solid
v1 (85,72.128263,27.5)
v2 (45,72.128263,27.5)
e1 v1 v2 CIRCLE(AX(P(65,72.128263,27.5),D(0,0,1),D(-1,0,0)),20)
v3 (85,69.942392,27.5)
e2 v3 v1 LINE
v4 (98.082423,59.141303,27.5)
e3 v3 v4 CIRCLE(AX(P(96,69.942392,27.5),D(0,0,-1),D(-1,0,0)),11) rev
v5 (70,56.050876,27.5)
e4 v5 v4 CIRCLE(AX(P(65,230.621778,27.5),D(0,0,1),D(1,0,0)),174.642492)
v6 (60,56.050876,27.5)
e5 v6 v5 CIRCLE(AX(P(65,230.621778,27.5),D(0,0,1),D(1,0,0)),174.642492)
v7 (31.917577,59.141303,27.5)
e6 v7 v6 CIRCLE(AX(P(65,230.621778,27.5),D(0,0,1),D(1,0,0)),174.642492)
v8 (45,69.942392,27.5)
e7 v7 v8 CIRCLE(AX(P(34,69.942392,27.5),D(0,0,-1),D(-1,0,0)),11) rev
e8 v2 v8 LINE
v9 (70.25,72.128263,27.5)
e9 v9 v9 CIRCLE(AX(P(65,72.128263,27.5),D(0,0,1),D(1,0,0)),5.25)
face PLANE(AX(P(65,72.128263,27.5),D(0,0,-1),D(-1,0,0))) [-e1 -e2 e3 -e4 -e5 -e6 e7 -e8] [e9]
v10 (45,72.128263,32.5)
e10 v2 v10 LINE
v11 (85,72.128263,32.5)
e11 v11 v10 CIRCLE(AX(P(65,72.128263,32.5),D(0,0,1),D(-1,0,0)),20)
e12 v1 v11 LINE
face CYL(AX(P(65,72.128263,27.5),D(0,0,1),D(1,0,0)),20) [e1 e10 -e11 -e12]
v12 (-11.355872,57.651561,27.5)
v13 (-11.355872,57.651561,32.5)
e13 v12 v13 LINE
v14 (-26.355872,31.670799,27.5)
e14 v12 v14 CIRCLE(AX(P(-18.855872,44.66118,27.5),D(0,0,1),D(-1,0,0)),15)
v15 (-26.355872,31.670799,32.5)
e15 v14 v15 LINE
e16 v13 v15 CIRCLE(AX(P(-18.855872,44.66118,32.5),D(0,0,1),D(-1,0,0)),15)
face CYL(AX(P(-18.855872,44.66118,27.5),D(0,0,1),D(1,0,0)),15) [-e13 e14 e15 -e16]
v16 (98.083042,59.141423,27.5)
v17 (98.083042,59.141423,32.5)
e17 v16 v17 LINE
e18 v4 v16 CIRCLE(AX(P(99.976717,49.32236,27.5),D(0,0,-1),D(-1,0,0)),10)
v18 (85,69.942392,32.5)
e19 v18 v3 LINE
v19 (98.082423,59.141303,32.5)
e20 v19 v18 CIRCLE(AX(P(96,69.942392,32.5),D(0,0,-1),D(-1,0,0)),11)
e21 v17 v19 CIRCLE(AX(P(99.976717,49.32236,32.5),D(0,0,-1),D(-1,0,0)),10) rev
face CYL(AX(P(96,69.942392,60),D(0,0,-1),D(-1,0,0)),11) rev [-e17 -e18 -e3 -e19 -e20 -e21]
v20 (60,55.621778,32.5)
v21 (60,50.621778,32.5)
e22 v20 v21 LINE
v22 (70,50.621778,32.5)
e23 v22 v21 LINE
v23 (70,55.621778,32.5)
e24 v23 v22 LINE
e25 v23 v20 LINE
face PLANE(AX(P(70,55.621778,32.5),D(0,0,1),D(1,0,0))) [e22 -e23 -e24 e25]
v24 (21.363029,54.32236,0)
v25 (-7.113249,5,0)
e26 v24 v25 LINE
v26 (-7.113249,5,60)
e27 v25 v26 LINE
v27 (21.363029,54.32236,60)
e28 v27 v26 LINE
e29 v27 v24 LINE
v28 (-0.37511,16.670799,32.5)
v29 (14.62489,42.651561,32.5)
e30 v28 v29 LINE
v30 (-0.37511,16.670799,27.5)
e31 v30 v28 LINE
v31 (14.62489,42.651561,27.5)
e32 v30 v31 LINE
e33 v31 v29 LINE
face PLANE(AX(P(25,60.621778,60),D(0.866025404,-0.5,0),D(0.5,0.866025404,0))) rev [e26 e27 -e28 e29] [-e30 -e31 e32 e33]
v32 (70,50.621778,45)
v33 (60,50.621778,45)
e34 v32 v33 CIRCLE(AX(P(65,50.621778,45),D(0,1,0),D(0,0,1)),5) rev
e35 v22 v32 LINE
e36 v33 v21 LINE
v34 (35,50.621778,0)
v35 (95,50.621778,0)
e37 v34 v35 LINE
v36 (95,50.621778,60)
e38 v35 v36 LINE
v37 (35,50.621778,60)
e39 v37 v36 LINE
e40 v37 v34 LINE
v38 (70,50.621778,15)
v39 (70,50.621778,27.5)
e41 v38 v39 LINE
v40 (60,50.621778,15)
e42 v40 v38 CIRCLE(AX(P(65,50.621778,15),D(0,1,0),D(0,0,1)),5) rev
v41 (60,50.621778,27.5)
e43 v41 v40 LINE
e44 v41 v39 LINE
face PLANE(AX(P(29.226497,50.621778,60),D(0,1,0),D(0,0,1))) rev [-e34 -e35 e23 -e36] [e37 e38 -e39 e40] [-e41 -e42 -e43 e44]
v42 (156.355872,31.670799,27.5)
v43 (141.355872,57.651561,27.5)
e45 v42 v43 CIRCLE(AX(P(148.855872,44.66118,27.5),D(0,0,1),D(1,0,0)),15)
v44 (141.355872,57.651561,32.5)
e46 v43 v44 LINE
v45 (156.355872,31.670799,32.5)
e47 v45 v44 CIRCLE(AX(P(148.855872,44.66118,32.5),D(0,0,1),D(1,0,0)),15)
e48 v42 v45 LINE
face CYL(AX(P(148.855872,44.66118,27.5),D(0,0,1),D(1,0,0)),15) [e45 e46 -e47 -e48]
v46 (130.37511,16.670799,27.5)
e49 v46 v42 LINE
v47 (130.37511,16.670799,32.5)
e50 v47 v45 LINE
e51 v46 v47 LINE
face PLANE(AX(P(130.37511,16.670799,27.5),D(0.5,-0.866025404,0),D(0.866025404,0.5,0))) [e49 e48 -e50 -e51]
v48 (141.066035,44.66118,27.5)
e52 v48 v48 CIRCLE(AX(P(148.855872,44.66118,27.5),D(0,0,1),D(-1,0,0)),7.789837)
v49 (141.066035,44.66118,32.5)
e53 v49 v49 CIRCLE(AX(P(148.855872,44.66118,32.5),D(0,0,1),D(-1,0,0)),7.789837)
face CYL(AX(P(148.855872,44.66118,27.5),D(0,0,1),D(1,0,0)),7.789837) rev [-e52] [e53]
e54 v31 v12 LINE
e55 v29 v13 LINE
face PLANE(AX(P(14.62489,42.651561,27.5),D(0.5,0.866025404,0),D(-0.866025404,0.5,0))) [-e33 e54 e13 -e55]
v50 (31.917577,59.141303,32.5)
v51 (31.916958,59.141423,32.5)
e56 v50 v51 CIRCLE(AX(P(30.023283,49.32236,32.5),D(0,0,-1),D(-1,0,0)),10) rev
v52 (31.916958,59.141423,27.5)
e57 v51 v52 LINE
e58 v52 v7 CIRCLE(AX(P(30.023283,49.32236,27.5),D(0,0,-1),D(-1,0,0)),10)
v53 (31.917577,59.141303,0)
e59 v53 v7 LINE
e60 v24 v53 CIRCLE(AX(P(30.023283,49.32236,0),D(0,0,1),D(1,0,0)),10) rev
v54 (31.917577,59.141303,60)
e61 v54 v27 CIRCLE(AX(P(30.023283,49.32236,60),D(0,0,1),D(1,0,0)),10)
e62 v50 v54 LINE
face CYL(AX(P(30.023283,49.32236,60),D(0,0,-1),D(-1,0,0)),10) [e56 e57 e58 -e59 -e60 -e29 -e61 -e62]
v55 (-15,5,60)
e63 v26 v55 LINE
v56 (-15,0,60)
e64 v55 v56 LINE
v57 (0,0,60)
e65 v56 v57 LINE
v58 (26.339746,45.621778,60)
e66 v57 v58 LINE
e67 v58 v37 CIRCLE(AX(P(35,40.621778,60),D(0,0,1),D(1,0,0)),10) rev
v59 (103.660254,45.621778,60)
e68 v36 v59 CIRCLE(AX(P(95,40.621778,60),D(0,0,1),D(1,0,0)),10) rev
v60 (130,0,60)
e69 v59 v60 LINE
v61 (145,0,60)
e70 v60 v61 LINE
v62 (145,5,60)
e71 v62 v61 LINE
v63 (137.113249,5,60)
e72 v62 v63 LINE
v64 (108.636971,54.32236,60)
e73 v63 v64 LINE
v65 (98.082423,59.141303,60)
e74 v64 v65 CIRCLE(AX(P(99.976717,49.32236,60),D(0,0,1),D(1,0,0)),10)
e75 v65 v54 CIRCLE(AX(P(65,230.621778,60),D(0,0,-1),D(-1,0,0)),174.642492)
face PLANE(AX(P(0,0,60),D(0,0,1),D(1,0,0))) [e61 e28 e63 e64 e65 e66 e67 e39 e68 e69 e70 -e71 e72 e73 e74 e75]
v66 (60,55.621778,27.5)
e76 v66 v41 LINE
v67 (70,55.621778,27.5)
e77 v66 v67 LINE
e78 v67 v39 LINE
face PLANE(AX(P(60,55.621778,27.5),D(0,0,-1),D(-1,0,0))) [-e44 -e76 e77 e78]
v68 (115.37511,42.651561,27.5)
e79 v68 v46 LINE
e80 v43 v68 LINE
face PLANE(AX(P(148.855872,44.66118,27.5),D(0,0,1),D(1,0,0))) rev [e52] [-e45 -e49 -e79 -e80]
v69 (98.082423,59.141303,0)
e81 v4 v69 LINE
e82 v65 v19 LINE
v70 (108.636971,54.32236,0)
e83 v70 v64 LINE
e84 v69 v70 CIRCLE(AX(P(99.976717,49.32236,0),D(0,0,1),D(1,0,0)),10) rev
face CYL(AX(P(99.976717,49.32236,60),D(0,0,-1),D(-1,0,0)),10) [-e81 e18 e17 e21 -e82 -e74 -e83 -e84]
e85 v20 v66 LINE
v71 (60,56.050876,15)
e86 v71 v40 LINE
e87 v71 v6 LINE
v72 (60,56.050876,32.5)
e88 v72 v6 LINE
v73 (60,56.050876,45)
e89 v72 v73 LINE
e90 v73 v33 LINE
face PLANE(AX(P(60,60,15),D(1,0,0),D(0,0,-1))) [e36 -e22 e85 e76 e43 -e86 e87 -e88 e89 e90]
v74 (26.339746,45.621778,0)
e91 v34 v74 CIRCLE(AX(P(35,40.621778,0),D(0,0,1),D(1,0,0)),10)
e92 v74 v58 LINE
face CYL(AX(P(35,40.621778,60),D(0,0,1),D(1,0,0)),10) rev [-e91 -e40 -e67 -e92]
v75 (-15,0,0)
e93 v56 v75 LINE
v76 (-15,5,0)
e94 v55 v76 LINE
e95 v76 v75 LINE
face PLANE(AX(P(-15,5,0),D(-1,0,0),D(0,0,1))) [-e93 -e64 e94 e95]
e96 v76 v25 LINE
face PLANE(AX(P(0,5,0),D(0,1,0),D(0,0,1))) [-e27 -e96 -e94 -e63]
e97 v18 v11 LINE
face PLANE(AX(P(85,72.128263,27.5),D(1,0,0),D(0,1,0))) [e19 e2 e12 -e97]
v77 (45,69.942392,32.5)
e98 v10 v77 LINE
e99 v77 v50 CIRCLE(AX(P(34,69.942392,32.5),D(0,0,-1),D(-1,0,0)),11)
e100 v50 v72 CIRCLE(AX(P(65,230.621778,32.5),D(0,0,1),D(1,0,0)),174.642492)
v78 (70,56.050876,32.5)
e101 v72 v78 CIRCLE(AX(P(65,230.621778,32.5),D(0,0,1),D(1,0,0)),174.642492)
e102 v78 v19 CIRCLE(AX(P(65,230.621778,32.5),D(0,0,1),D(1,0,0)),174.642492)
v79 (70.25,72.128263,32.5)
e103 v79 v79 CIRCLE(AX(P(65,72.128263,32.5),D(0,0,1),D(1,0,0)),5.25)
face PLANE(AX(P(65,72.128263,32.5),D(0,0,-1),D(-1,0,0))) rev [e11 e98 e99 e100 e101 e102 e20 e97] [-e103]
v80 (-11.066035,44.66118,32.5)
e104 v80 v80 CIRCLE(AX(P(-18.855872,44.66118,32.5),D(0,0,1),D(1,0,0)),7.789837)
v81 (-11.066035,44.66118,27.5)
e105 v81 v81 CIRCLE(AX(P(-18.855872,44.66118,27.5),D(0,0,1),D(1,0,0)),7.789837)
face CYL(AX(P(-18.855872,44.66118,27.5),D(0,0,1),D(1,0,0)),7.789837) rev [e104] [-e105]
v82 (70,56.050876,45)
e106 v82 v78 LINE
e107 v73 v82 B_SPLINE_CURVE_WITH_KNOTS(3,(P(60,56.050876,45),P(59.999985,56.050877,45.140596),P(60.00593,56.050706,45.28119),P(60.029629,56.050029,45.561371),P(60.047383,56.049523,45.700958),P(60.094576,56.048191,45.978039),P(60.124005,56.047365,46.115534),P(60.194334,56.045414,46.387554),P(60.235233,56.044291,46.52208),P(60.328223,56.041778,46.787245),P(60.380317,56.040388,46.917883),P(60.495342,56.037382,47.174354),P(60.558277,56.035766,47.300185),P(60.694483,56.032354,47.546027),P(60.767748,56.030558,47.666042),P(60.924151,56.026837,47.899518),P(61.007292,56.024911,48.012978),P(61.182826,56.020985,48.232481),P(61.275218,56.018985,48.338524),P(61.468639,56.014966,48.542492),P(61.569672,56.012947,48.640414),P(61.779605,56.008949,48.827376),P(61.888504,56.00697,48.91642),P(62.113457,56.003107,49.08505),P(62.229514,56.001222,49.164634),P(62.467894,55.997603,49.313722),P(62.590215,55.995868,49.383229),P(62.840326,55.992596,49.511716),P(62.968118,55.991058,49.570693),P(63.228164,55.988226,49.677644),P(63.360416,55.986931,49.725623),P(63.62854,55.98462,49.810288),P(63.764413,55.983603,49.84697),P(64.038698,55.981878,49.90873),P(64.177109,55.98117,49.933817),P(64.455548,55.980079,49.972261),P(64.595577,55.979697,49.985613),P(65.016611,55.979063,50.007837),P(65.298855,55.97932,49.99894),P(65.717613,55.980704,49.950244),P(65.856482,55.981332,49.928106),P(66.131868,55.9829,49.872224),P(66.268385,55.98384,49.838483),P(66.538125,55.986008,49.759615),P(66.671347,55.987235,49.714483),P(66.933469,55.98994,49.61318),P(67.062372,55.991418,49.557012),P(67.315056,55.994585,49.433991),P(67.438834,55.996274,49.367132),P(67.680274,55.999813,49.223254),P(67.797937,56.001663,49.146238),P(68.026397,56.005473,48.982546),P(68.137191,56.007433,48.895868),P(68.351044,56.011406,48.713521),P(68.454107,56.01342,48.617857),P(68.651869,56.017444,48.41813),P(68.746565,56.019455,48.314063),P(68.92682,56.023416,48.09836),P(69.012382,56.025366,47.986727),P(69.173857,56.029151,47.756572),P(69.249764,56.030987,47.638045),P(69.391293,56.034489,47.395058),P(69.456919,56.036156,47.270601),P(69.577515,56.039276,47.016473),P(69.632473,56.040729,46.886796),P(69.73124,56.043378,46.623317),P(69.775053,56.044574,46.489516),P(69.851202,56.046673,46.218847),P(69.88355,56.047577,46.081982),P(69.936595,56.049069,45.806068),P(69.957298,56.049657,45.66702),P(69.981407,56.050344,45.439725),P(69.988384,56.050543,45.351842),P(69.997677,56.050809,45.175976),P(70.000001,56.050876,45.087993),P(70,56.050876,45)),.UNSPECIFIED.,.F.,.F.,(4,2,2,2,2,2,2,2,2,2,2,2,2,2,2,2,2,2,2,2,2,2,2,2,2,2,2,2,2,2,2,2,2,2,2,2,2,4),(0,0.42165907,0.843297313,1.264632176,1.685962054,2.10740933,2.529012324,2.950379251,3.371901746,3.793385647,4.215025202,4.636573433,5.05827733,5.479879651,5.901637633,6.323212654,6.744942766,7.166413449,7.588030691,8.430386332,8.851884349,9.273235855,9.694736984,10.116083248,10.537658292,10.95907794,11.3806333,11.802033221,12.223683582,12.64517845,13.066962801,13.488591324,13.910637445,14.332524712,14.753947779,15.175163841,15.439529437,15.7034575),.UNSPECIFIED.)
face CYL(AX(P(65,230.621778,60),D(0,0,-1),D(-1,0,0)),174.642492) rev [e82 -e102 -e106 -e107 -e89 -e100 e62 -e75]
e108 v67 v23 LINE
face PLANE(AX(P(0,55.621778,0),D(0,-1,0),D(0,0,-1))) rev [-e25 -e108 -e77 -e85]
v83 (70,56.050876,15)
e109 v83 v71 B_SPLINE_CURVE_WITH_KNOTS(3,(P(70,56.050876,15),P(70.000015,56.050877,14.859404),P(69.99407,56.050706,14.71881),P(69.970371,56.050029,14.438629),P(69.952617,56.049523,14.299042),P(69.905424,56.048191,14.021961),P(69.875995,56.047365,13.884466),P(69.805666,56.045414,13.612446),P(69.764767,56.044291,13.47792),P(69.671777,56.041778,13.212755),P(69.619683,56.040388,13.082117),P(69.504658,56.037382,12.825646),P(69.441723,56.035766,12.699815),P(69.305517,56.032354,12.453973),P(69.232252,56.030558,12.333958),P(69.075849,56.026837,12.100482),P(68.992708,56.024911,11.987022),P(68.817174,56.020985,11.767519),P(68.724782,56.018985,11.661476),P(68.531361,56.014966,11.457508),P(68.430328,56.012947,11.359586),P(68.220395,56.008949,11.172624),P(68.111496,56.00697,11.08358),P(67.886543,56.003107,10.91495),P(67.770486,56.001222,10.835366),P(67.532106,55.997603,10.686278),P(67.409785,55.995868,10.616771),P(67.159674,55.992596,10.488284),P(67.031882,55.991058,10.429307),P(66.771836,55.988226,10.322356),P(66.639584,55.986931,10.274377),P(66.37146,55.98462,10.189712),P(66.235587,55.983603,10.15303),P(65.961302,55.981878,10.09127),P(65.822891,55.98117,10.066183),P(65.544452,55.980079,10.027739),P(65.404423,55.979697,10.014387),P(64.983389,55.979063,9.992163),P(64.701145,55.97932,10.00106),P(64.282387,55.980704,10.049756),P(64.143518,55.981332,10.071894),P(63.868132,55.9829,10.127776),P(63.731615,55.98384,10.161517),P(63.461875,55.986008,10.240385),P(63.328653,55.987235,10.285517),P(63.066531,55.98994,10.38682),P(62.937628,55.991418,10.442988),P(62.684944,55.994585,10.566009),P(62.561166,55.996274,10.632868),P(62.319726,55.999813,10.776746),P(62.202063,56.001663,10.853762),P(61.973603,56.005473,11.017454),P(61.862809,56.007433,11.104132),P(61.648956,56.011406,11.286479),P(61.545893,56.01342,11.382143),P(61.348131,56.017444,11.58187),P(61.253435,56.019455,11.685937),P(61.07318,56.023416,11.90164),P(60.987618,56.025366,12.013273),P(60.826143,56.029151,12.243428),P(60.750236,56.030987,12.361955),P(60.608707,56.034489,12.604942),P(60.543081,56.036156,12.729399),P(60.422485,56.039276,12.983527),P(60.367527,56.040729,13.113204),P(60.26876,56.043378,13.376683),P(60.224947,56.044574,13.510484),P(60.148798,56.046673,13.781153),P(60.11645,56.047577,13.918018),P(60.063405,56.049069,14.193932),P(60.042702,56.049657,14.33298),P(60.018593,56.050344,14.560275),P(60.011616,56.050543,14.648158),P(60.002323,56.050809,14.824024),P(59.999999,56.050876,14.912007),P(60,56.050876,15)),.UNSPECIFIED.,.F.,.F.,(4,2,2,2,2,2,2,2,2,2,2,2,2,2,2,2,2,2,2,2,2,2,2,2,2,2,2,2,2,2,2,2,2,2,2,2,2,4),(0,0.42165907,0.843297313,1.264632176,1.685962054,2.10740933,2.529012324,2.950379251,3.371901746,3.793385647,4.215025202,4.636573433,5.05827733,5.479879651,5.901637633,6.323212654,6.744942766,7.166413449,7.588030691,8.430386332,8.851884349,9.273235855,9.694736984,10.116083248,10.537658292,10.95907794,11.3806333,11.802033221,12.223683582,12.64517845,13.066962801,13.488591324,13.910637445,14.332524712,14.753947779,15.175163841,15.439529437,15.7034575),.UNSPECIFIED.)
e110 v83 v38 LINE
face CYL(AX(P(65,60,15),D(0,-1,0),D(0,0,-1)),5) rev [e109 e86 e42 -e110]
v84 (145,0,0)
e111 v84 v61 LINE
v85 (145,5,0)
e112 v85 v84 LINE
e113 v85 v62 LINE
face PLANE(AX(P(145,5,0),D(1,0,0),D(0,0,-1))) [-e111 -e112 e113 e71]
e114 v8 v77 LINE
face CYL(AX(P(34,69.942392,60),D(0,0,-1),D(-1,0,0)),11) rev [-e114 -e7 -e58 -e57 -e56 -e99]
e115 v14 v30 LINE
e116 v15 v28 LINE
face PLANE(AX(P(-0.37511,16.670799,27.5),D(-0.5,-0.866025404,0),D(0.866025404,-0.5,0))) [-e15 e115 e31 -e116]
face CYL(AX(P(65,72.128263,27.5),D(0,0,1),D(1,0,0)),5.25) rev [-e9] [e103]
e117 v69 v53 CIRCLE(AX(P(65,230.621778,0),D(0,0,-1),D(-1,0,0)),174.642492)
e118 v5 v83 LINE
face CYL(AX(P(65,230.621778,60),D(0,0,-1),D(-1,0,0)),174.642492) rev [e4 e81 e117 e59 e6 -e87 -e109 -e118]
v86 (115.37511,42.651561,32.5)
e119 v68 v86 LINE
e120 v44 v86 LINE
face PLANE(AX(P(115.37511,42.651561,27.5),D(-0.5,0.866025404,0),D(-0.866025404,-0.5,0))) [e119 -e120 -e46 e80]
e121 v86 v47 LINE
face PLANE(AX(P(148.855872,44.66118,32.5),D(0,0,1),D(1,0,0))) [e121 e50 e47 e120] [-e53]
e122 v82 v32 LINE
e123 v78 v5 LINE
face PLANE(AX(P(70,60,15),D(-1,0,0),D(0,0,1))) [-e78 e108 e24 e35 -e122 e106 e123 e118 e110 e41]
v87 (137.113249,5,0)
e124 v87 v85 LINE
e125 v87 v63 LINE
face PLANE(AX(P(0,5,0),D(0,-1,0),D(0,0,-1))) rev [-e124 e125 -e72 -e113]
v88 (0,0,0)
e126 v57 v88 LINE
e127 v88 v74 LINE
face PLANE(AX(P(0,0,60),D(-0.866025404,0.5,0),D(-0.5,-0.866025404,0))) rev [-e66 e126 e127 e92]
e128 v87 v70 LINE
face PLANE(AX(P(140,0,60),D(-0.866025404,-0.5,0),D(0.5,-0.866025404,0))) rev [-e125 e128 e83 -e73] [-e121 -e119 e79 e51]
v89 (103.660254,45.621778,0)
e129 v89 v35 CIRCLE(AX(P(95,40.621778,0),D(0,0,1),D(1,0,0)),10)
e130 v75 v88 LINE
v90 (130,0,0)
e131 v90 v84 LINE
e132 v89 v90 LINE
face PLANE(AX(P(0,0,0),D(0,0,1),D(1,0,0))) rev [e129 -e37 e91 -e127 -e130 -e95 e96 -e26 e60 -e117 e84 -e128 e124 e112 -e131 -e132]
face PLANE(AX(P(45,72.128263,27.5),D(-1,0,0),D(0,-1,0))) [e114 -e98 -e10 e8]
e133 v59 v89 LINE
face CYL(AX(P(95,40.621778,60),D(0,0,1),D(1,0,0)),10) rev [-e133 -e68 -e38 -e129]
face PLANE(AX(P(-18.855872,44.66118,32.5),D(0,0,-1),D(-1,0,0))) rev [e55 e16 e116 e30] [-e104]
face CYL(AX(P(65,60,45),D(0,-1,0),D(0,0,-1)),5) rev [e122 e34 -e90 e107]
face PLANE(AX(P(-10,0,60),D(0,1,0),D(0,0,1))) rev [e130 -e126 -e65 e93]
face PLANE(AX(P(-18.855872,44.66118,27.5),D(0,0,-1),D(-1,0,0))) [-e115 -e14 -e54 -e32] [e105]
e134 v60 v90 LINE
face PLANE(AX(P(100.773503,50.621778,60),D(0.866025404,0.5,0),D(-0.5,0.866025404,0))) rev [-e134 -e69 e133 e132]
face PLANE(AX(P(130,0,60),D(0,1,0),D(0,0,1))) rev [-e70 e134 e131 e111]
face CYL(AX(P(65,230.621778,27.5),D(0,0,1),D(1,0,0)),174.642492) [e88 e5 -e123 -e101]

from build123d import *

# Parameters (mm, degrees)
BOSS_EXTRU_1_DEPTH      = 60
ENL_V_MAT_EXTRU_1_DEPTH = 60
CONG_1_R                = 10
ENL_V_MAT_EXTRU_2_DEPTH = 60
CONG_2_R                = 10
ESQUISSE4_W             = 15
ESQUISSE4_H             = 60
BOSS_EXTRU_2_DEPTH      = 5
BOSS_EXTRU_3_START      = -32.5
ESQUISSE5_R             = 7.789836859
ESQUISSE5_R_2           = 5.25
BOSS_EXTRU_3_DEPTH      = 5
ESQUISSE6_W             = 10
ESQUISSE6_H             = 5
BOSS_EXTRU_4_DEPTH      = 5
CONG_3_R                = 11


with BuildPart() as part:
    # Esquisse1 → Boss.-Extru.1 (new body)
    with BuildSketch(Plane.XY):
        Polygon((0, 0), (29.226497308, 50.621778265), (100.773502692, 50.621778265), (130, 0), (140, 0), (105, 60.621778265), (25, 60.621778265), (-10, 0), align=None)
    extrude(amount=BOSS_EXTRU_1_DEPTH)

    # Esquisse2 → Enlèv. mat.-Extru.1 (cut)
    with BuildSketch(Plane(origin=(0, 0, 0), x_dir=(-1, 0, 0), z_dir=(0, 0, -1))):
        with BuildLine():
            Line((-105, 60.621778265), (-25, 60.621778265))
            ThreePointArc((-25, 60.621778265), (-65, 55.979286299), (-105, 60.621778265))
        make_face()
    extrude(amount=-ENL_V_MAT_EXTRU_1_DEPTH, mode=Mode.SUBTRACT)

    # Congé1
    cong_1_edges = [part.edges().sort_by_distance(p)[0] for p in [
        (25, 60.621778265, 30),
        (105, 60.621778265, 30),
    ]]
    fillet(cong_1_edges, radius=CONG_1_R)

    # Esquisse3 → Enlèv. mat.-Extru.2 (cut)
    with BuildSketch(Plane(origin=(0, 0, 0), x_dir=(1, 0, 0), z_dir=(0, 1, 0))):
        with BuildLine():
            Line((70, -15), (70, -45))
            ThreePointArc((70, -45), (65, -50), (60, -45))
            Line((60, -45), (60, -15))
            ThreePointArc((60, -15), (65, -10), (70, -15))
        make_face()
    extrude(amount=ENL_V_MAT_EXTRU_2_DEPTH, mode=Mode.SUBTRACT)

    # Congé2
    cong_2_edges = [part.edges().sort_by_distance(p)[0] for p in [
        (100.773502692, 50.621778265, 30),
        (29.226497308, 50.621778265, 30),
    ]]
    fillet(cong_2_edges, radius=CONG_2_R)

    # Esquisse4 → Boss.-Extru.2 (add)
    with BuildSketch(Plane.XZ):
        with Locations((-7.5, 30)):
            Rectangle(ESQUISSE4_W, ESQUISSE4_H)
        with Locations((137.5, 30)):
            Rectangle(ESQUISSE4_W, ESQUISSE4_H)
    extrude(amount=-BOSS_EXTRU_2_DEPTH)

    # Esquisse5 → Boss.-Extru.3 (add)
    # profile 1 of 3: a face of its own
    with BuildSketch(Plane.XY.offset(60).offset(BOSS_EXTRU_3_START)):
        with BuildLine():
            Line((115.375109784, 42.651560984), (141.355871898, 57.651560984))
            ThreePointArc((141.355871898, 57.651560984), (161.846252955, 52.161179927), (156.355871898, 31.670798871))
            Line((156.355871898, 31.670798871), (130.375109784, 16.670798871))
            Line((130.375109784, 16.670798871), (115.375109784, 42.651560984))
        make_face()
        with Locations(Location((148.855871898, 44.661179927, 0), (0, 0, 180))):
            Circle(ESQUISSE5_R, mode=Mode.SUBTRACT)
    # profile 2 of 3: a face of its own
    with BuildSketch(Plane.XY.offset(60).offset(BOSS_EXTRU_3_START)):
        with BuildLine():
            Line((14.624890216, 42.651560984), (-0.375109784, 16.670798871))
            Line((-0.375109784, 16.670798871), (-26.355871898, 31.670798871))
            ThreePointArc((-26.355871898, 31.670798871), (-31.846252955, 52.161179927), (-11.355871898, 57.651560984))
            Line((-11.355871898, 57.651560984), (14.624890216, 42.651560984))
        make_face()
        with Locations((-18.855871898, 44.661179927)):
            Circle(ESQUISSE5_R, mode=Mode.SUBTRACT)
    # profile 3 of 3: a face of its own
    with BuildSketch(Plane.XY.offset(60).offset(BOSS_EXTRU_3_START)):
        with BuildLine():
            Line((45, 72.128262536), (45, 57.128262536))
            ThreePointArc((45, 57.128262536), (65, 55.979286299), (85, 57.128262536))
            Line((85, 57.128262536), (85, 72.128262536))
            ThreePointArc((85, 72.128262536), (65, 92.128262536), (45, 72.128262536))
        make_face()
        with Locations((65, 72.128262536)):
            Circle(ESQUISSE5_R_2, mode=Mode.SUBTRACT)
    extrude(amount=BOSS_EXTRU_3_DEPTH)

    # Esquisse6 → Boss.-Extru.4 (add)
    with BuildSketch(Plane.XZ.offset(-50.621778265)):
        with Locations((65, 30)):
            Rectangle(ESQUISSE6_W, ESQUISSE6_H)
    extrude(amount=-BOSS_EXTRU_4_DEPTH)

    # Congé3
    # the kernel refuses this fillet: 11 mm, written as the material it adds along each edge
    with BuildSketch(Plane(origin=(85, 57.128262536, 27.5), x_dir=(0.9883685049856061, 0.15207793512708467, 0), z_dir=(0, 0, 1))) as cong_3_piece_1:
        with BuildLine():
            CenterArc((12.820682636, 10.992120116), CONG_3_R, 171.25263481, 100.916203285)
            Line((1.948629081, 12.664977402), (0.861423726, 12.832263131))
            ThreePointArc((0.861423726, 12.832263131), (-0.112841396, 6.499766826), (-1.087205355, 0.167285729))
            Line((-1.087205355, 0.167285729), (-0.041678758, -1.099210117))
            ThreePointArc((-0.041678758, -1.099210117), (13.278085549, -1.099131399), (13.278598986, -1.099212012))
            Line((13.278598986, -1.099212012), (13.236970227, 0))
        make_face()
    extrude(amount=5)
    with BuildSketch(Plane(origin=(45, 57.128262536, 27.5), x_dir=(-0.9883685049856065, 0.1520779351270834, 0), z_dir=(0, 0, 1))) as cong_3_piece_2:
        with BuildLine():
            CenterArc((12.820682636, -10.992120116), CONG_3_R, 87.831161905, 100.916203285)
            Line((1.948629081, -12.664977402), (0.861423726, -12.832263131))
            ThreePointArc((0.861423726, -12.832263131), (-0.112841396, -6.499766826), (-1.087205355, -0.167285729))
            Line((-1.087205355, -0.167285729), (-0.041678758, 1.099210117))
            ThreePointArc((-0.041678758, 1.099210117), (13.278085549, 1.099131399), (13.278598986, 1.099212012))
            Line((13.278598986, 1.099212012), (13.236970227, 0))
        make_face()
    extrude(amount=5)


solid = part.part
